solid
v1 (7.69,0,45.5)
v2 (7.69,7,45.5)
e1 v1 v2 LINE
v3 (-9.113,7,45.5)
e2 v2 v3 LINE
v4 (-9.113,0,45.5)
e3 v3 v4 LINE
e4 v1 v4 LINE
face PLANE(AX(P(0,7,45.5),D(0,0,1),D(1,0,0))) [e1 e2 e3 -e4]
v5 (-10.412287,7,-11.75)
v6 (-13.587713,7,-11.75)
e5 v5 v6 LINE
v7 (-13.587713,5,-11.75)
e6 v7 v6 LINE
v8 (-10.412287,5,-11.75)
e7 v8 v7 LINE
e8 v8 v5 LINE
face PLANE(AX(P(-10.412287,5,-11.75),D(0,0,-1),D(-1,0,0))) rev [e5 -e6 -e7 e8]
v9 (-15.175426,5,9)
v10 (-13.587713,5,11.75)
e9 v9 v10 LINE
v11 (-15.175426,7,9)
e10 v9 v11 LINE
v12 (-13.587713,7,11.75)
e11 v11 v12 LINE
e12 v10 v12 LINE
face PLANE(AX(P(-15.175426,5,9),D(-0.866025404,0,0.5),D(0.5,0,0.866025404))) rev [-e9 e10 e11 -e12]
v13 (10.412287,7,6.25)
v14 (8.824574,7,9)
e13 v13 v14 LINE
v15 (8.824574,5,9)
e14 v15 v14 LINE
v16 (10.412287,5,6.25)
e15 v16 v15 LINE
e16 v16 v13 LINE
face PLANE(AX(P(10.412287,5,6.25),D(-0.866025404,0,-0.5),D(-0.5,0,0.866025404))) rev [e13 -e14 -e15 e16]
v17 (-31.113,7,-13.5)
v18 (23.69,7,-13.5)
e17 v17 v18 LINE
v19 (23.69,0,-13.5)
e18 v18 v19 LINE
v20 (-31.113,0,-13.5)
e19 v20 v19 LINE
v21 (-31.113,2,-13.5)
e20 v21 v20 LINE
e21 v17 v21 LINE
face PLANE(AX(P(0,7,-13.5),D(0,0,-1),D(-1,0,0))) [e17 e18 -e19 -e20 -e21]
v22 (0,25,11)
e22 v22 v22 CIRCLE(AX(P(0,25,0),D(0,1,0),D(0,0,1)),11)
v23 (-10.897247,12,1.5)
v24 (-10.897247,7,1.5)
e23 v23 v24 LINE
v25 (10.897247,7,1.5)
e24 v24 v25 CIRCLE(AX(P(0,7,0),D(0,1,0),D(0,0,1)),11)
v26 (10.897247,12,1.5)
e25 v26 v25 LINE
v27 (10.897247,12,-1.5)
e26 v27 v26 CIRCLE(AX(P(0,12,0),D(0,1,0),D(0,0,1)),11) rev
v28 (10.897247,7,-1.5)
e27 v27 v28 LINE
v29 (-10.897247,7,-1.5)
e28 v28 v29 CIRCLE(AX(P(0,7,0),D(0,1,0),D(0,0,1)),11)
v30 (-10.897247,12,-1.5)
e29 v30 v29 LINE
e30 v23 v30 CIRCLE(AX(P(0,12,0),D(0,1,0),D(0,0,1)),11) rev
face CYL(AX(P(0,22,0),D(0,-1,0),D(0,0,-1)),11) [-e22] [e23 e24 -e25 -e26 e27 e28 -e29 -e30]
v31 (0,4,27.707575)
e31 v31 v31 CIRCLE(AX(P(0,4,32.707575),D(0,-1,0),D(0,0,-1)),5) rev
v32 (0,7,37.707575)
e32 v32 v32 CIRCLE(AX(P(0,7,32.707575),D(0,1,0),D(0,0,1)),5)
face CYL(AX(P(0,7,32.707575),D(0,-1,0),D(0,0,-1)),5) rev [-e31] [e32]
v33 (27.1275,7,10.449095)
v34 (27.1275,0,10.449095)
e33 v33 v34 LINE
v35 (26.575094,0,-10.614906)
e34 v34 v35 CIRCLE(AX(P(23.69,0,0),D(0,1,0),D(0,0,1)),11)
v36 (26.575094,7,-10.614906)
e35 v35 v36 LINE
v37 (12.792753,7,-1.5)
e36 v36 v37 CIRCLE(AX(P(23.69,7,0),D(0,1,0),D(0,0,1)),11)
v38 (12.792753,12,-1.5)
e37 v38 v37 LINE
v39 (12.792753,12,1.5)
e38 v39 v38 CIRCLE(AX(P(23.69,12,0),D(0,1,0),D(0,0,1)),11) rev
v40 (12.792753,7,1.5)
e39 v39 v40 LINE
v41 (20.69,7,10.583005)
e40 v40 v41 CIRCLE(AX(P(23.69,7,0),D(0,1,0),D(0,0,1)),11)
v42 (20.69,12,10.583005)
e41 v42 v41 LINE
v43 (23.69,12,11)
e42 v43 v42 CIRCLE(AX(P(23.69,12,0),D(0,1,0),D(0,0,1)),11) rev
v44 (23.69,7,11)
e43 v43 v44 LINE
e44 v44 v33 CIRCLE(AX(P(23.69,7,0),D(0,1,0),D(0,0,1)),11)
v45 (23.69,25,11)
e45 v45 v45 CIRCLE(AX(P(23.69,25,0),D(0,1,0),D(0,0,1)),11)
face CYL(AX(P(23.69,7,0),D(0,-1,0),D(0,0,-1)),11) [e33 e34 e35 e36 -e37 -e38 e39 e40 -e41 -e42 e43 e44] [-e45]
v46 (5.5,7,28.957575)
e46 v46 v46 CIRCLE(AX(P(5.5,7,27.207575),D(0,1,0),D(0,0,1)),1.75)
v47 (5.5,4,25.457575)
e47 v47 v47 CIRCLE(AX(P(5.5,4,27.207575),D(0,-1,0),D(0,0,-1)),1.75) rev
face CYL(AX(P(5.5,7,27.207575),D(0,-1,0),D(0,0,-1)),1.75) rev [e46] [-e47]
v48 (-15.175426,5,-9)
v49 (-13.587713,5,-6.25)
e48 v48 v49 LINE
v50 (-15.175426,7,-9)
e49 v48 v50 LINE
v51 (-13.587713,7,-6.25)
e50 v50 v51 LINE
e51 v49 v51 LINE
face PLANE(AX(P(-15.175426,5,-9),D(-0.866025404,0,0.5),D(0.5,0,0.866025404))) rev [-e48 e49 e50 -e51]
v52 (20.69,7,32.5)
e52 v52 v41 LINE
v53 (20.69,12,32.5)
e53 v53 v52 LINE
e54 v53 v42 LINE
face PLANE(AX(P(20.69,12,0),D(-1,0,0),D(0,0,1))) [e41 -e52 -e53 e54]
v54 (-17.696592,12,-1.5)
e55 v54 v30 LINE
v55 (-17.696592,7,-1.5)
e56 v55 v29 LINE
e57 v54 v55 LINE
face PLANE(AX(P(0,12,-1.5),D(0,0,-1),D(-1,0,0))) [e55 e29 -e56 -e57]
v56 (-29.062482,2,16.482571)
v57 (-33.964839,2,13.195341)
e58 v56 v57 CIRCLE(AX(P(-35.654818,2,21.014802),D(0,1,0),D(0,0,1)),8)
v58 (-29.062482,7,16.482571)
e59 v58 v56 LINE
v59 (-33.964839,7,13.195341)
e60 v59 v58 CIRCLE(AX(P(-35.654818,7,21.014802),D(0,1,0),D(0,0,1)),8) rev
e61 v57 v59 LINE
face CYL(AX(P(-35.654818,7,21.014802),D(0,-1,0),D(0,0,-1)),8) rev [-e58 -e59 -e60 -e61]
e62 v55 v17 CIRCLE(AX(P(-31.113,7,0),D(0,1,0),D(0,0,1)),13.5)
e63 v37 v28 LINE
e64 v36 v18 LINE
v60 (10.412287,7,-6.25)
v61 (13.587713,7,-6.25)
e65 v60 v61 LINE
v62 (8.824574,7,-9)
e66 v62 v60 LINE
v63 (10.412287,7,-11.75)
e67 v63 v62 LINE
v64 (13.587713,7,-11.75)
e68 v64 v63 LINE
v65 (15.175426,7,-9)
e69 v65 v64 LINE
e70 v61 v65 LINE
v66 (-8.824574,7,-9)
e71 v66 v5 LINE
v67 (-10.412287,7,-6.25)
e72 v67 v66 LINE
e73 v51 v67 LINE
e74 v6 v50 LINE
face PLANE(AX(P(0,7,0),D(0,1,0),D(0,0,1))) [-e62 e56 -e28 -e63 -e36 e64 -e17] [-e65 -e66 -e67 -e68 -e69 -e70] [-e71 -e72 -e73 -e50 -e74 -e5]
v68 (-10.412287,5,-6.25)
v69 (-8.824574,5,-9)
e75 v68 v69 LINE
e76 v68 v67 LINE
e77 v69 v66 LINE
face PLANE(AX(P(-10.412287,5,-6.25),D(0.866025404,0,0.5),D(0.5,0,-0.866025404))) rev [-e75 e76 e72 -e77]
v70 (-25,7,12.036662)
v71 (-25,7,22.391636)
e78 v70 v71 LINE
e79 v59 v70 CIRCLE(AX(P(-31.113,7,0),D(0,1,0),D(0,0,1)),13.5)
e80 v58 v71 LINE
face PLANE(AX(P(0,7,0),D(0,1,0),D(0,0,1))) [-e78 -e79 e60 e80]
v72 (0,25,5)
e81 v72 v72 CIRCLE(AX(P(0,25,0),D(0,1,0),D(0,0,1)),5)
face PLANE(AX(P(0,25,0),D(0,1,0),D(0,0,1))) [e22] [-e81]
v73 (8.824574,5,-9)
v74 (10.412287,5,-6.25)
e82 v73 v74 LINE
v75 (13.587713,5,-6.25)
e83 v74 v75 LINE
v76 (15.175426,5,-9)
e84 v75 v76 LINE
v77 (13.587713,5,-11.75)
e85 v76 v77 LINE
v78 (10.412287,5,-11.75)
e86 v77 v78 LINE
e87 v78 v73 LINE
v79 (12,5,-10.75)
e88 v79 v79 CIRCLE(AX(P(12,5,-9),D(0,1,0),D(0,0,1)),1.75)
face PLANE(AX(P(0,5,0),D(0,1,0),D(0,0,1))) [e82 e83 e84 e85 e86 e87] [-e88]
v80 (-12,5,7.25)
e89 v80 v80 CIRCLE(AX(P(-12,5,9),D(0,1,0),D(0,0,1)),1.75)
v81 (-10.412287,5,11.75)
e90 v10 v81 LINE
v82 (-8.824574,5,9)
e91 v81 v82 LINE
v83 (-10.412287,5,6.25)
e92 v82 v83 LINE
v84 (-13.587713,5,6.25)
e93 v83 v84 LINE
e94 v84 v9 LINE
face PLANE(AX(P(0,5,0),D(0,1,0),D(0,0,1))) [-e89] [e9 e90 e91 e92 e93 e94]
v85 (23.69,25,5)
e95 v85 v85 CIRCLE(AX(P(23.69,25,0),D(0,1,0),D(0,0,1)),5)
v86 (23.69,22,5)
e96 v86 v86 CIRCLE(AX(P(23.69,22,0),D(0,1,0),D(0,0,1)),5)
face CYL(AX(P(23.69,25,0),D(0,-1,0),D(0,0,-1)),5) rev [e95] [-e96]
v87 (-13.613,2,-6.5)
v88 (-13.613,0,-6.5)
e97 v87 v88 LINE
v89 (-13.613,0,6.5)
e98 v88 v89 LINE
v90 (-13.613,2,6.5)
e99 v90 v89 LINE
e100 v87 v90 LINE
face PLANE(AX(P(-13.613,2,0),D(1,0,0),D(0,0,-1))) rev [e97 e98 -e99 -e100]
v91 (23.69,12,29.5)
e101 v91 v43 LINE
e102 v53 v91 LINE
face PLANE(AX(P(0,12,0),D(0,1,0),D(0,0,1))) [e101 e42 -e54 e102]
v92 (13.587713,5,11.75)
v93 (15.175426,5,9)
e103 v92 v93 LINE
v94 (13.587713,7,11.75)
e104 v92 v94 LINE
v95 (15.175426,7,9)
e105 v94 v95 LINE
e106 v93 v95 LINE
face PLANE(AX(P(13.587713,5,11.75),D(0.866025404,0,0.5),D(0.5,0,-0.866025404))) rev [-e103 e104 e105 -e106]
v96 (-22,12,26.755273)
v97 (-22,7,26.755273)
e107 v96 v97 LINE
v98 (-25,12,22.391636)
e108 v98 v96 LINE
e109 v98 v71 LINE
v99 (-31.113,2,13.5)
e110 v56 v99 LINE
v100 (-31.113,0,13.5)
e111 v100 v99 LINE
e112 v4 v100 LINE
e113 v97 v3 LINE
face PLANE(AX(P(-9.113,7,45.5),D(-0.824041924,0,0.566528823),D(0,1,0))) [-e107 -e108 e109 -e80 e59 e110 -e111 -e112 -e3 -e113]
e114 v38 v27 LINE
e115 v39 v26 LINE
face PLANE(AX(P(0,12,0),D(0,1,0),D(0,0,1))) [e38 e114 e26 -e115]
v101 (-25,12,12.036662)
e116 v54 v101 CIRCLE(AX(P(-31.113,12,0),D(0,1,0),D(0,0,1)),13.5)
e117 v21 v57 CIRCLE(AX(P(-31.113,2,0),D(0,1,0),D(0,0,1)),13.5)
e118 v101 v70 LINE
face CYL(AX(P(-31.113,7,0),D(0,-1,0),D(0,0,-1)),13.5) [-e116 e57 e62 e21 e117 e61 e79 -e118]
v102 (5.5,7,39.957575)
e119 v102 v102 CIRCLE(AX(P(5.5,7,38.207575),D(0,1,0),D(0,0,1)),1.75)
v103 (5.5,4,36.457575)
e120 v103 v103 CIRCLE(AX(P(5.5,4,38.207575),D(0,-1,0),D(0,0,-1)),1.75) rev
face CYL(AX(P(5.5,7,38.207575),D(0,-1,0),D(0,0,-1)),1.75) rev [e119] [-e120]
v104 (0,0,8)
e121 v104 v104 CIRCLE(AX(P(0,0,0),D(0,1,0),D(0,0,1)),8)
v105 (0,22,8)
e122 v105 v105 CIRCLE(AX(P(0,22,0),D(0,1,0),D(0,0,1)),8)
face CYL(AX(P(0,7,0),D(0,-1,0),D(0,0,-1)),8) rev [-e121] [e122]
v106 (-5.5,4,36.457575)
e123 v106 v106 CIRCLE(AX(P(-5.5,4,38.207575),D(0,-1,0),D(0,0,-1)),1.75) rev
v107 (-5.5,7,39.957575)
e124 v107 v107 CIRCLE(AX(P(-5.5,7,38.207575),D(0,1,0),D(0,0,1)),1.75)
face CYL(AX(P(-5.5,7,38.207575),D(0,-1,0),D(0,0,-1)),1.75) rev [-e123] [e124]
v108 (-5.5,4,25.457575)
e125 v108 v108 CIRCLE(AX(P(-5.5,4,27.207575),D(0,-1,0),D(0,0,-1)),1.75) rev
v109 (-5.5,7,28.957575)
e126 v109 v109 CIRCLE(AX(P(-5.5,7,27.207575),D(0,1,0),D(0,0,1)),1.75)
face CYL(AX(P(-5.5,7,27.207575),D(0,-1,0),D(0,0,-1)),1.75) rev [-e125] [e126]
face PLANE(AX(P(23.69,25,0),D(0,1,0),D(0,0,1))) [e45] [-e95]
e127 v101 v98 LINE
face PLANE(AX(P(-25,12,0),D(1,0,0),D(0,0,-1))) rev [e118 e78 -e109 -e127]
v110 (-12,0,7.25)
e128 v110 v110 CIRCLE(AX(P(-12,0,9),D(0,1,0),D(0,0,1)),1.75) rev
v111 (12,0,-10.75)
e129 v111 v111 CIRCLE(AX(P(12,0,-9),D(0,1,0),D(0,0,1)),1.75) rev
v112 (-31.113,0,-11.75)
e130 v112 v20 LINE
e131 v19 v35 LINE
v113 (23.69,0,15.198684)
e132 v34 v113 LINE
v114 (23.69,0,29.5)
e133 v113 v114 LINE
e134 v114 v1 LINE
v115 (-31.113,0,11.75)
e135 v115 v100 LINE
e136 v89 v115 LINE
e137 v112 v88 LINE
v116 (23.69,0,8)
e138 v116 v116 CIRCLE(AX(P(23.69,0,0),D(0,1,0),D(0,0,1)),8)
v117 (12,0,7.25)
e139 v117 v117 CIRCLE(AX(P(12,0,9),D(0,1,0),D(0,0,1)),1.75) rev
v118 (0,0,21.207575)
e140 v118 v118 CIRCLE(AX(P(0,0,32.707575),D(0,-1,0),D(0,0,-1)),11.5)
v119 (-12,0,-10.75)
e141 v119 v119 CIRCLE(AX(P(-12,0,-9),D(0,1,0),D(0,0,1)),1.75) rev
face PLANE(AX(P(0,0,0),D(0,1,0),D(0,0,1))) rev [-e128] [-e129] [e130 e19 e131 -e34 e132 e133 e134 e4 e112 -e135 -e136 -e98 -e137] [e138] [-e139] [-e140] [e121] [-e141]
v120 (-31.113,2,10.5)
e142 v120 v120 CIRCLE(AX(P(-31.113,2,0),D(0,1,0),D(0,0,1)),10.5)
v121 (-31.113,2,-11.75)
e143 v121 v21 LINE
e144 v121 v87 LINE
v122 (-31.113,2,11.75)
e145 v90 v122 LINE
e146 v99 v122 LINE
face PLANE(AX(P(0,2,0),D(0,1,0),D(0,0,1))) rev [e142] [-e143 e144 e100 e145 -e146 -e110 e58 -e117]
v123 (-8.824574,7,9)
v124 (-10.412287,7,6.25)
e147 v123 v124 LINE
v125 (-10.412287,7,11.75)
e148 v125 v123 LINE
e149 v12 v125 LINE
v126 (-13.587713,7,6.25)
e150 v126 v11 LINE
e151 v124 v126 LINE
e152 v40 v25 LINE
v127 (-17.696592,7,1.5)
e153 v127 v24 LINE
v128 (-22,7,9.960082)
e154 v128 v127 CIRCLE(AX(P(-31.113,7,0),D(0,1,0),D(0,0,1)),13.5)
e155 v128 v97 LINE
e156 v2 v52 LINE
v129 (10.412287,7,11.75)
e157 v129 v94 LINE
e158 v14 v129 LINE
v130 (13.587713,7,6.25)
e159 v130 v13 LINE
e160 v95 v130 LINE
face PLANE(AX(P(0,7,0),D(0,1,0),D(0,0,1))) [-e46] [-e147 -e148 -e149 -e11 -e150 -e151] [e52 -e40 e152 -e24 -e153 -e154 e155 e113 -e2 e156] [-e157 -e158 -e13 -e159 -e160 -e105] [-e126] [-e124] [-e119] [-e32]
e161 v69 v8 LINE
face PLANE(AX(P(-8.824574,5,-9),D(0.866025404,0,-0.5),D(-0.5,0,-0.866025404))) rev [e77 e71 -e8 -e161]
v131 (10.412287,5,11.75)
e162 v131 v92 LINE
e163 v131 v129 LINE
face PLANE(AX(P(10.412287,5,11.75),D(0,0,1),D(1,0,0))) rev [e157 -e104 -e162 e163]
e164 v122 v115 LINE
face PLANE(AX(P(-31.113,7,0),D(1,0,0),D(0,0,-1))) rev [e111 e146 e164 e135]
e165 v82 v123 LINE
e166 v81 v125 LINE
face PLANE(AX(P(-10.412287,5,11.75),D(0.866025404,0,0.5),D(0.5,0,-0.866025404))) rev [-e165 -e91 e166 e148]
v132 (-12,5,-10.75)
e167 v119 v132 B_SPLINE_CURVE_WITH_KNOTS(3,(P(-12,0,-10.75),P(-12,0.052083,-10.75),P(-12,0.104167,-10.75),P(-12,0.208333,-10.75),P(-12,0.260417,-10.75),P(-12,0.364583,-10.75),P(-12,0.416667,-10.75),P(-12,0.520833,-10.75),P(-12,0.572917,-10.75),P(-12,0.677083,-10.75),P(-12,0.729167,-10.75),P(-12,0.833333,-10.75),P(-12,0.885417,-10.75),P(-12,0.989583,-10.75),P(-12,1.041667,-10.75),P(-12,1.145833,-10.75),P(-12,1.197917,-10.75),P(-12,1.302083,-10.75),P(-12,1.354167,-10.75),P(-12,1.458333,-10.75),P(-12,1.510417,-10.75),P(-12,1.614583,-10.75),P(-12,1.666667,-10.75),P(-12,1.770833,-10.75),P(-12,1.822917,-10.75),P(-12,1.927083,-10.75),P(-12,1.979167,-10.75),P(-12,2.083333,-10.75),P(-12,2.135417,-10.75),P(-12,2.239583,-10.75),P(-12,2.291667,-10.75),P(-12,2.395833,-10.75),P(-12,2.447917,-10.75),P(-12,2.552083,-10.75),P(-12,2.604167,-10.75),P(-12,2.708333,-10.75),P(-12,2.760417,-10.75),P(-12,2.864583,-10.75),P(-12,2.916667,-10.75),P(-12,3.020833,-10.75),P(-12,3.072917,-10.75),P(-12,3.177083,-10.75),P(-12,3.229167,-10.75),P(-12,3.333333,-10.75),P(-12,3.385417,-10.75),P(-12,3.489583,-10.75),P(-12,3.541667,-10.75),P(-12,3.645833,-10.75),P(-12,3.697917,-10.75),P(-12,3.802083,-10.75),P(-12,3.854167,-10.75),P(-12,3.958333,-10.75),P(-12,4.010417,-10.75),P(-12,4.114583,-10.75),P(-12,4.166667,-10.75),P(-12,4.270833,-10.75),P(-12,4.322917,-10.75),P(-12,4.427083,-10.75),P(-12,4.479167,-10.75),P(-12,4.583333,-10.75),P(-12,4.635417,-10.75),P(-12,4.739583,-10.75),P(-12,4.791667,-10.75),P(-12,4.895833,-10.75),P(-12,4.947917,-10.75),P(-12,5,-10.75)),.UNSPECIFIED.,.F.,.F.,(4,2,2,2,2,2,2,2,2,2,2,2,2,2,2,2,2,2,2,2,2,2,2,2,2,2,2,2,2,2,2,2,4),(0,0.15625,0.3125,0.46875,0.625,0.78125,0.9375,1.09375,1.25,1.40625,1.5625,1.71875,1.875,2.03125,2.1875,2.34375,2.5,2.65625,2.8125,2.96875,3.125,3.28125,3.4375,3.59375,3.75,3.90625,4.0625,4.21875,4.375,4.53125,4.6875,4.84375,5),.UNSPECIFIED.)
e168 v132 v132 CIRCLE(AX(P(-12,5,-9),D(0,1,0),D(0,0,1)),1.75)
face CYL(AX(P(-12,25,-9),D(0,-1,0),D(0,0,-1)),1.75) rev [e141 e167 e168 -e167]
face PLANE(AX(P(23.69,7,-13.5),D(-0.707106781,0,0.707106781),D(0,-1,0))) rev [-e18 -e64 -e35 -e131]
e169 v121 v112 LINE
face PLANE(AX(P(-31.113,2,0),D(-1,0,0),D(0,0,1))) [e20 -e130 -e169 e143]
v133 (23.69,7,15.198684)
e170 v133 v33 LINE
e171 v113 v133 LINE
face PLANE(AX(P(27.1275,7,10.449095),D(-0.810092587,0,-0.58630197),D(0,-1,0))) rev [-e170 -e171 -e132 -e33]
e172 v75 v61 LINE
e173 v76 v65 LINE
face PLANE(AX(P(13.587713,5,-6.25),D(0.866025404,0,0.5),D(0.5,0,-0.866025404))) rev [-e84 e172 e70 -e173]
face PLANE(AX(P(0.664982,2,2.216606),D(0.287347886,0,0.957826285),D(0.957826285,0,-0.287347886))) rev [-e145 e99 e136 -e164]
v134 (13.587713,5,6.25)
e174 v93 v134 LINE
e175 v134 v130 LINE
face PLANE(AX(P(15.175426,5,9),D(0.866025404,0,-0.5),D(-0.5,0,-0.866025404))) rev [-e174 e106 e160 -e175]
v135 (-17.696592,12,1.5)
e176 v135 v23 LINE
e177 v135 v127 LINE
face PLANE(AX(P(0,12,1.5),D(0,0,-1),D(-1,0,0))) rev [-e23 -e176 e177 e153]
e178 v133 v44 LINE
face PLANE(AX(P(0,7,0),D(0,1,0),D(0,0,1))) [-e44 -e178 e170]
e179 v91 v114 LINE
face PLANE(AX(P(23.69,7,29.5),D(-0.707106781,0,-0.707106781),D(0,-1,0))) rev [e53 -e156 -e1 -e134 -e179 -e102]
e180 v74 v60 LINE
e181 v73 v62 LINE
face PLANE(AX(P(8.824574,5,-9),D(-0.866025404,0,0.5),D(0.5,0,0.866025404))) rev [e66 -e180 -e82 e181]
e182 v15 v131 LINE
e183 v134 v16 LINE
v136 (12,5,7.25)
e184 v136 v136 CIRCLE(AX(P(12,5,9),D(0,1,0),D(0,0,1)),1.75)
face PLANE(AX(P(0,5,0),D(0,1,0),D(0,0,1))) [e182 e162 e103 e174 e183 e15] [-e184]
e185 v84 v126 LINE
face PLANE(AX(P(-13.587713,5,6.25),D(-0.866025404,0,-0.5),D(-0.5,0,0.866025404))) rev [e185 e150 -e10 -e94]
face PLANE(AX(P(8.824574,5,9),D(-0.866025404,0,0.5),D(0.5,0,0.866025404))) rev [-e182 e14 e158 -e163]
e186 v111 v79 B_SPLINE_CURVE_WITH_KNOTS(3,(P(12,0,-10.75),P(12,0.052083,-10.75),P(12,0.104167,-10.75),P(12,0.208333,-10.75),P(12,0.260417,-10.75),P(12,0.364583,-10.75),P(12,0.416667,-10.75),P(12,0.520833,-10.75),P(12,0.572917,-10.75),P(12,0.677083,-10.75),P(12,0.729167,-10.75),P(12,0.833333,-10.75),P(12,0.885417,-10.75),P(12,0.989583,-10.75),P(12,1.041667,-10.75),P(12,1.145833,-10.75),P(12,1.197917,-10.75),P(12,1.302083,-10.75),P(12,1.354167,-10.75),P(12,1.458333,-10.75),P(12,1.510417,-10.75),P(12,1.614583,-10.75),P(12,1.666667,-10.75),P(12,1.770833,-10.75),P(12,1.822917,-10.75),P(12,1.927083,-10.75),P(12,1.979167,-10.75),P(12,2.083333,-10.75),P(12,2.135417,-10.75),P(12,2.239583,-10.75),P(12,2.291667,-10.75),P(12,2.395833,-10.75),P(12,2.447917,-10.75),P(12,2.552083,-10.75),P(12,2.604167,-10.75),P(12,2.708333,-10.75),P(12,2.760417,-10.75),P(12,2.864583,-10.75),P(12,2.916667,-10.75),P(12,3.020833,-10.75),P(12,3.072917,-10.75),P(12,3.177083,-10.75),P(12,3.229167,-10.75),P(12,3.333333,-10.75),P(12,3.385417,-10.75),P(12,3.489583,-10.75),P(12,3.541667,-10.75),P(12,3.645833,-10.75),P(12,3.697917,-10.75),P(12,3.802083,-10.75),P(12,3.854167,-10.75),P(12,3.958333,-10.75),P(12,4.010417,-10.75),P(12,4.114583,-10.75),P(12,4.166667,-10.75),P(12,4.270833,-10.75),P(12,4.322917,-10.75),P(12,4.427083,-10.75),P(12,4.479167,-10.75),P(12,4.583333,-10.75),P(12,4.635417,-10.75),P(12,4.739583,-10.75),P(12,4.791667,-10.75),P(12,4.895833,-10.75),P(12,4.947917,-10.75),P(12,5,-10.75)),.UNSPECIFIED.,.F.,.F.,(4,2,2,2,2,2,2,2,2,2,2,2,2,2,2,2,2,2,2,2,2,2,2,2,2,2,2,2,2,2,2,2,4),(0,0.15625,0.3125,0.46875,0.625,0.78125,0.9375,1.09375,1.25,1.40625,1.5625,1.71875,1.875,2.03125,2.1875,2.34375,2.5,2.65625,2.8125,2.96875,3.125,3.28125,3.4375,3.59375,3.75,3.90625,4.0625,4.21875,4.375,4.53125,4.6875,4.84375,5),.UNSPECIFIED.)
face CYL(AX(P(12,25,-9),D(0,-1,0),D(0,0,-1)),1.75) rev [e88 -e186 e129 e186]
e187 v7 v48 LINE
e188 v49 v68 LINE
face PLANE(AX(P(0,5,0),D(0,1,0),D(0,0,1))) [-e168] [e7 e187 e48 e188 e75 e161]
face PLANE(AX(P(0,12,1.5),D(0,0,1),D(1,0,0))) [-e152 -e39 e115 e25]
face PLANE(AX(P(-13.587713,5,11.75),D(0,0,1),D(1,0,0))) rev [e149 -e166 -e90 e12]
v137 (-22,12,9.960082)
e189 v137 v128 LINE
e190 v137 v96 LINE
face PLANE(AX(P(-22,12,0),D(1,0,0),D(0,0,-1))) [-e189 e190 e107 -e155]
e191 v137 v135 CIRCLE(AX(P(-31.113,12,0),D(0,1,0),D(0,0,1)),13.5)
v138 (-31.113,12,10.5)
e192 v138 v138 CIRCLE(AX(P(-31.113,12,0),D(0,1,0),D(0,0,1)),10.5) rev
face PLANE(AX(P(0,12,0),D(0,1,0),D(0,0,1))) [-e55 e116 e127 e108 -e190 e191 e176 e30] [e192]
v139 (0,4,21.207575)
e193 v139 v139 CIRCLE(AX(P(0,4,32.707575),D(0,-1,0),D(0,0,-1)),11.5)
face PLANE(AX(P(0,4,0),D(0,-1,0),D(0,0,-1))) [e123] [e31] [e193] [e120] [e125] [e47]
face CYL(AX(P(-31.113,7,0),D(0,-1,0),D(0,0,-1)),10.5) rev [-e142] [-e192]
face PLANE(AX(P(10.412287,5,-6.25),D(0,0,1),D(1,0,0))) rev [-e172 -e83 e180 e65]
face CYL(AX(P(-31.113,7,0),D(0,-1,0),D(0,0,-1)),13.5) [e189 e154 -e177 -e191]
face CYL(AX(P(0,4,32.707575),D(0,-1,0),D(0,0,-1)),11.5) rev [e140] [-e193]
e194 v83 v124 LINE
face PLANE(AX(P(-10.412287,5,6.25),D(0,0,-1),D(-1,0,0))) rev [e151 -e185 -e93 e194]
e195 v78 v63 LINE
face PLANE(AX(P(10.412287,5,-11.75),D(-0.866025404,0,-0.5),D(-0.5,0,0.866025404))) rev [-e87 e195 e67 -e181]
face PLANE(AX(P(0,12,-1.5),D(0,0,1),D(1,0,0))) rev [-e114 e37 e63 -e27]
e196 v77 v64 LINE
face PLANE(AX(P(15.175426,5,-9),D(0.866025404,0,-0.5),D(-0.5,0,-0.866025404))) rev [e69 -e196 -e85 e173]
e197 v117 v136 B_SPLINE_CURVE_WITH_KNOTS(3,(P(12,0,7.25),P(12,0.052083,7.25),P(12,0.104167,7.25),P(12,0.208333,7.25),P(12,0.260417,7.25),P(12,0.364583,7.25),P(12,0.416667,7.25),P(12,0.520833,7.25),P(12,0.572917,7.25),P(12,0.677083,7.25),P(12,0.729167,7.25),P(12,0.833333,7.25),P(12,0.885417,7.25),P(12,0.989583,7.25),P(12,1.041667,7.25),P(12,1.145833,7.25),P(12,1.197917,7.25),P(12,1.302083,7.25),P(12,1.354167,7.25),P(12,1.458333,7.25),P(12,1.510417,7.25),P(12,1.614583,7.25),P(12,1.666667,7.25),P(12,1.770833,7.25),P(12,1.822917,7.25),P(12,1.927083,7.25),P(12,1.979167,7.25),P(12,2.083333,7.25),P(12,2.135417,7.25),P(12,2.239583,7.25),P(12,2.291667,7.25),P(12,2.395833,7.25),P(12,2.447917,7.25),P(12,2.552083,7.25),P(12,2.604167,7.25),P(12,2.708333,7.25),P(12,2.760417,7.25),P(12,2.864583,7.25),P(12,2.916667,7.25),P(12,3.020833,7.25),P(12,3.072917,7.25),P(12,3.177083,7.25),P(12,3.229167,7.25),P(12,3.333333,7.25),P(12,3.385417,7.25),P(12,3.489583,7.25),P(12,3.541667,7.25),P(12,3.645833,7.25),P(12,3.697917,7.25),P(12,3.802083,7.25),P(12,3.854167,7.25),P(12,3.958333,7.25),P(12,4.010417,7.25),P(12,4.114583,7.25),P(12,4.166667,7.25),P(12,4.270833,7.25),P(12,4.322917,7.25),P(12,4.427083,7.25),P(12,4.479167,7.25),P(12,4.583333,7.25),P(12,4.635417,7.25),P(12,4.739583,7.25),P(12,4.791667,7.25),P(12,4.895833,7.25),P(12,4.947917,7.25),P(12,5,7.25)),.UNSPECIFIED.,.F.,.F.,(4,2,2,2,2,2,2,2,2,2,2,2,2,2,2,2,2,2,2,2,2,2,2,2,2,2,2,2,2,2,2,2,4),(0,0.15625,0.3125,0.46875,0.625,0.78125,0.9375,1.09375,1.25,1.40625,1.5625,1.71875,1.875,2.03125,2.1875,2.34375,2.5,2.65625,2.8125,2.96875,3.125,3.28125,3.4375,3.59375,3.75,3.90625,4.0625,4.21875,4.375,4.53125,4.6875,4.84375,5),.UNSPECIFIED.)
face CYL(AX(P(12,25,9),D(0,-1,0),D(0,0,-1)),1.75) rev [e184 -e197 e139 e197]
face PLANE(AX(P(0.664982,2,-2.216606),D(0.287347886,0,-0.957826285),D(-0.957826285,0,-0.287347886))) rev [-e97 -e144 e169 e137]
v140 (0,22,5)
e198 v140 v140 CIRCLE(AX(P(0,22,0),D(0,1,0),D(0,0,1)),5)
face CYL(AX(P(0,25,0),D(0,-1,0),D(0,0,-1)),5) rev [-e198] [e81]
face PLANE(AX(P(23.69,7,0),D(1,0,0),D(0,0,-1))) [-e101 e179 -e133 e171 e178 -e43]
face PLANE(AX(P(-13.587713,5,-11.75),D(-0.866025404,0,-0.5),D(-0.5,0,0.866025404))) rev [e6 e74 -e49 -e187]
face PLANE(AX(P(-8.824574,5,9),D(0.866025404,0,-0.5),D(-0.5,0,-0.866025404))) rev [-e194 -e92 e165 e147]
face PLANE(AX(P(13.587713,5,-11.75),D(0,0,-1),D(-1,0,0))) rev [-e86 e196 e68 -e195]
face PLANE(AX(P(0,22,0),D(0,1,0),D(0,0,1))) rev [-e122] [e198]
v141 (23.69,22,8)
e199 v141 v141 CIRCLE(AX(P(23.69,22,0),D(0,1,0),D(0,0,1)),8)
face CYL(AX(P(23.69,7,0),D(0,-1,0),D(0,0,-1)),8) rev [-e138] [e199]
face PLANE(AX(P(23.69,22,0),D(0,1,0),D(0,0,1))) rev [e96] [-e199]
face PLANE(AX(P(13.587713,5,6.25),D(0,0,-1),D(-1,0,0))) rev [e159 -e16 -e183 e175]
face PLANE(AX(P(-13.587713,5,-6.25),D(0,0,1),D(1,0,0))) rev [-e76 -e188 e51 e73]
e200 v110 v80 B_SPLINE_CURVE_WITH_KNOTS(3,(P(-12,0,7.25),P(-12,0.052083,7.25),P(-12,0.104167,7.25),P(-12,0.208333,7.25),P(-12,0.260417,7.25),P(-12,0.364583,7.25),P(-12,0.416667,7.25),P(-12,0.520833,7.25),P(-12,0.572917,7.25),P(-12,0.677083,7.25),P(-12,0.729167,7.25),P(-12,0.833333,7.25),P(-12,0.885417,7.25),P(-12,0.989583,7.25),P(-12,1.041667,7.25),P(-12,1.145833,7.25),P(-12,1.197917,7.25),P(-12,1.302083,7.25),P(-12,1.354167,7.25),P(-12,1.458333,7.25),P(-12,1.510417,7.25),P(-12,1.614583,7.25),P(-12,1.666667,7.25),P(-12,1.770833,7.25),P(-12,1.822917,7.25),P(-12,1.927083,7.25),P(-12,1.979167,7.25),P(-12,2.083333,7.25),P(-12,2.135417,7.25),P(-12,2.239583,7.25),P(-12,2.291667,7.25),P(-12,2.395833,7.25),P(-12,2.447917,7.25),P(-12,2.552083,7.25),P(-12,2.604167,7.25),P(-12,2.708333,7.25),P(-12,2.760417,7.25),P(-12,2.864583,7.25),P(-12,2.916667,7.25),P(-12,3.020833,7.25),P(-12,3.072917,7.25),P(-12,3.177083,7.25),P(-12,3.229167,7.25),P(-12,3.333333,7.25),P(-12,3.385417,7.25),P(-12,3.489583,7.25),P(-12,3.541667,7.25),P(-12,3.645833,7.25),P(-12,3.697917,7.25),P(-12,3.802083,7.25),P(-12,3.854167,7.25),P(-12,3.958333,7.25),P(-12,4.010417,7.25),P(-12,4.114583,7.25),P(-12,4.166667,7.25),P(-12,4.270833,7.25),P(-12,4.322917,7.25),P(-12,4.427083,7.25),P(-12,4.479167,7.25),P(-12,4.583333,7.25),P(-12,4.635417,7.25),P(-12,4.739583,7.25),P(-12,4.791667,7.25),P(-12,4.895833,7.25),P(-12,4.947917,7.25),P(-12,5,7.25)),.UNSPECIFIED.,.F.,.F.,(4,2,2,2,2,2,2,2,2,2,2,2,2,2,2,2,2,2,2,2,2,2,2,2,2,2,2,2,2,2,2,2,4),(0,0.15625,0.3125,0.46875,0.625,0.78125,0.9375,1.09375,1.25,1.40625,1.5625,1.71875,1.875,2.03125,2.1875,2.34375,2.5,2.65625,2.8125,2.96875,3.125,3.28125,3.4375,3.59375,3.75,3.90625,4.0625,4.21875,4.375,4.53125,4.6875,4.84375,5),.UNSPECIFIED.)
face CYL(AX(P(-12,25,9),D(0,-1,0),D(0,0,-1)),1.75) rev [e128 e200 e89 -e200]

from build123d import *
from build123d.topology import SkipClean

# Parameters (mm, degrees)
SKETCH3_R               = 8
SKETCH3_W               = 54.803
SKETCH3_H               = 32
SKETCH3_R_2             = 5
BOSS_EXTRUDE1_DEPTH     = 7
CUT_EXTRUDE3_DEPTH      = 65.105926161
CUT_EXTRUDE3_DEPTH_BACK = 65.105926161
SKETCH4_R               = 1.75
SKETCH6_R               = 11
SKETCH6_R_2             = 8
BOSS_EXTRUDE2_DEPTH     = 15
SKETCH7_R               = 11
SKETCH7_R_2             = 5
BOSS_EXTRUDE3_DEPTH     = 3
CHAMFER1_SIZE           = 2.5
CUT_EXTRUDE4_DEPTH      = 2
CUT_EXTRUDE5_DEPTH      = 69.451221823
CUT_EXTRUDE5_DEPTH_BACK = 69.451221823
SKETCH9_R               = 1.75
CUT_EXTRUDE6_START      = -2
SKETCH10_R              = 1.75
CUT_EXTRUDE6_DEPTH      = 2
CHAMFER3_SIZE           = 32
CHAMFER3_SIZE2          = 22
CHAMFER4_SIZE           = 16
FILLET1_R               = 8
SKETCH12_R              = 10.5
BOSS_EXTRUDE4_DEPTH     = 5
BOSS_EXTRUDE5_DEPTH     = 5
SKETCH14_R              = 11.5
SKETCH14_R_2            = 5
SKETCH14_R_3            = 1.75
CUT_EXTRUDE7_DEPTH      = 4


with BuildPart() as part:
    # Sketch3 → Boss-Extrude1 (new body)
    # profile 1 of 10: a face of its own
    with BuildSketch(Plane(origin=(0, 0, 0), x_dir=(1, 0, 0), z_dir=(0, 1, 0))):
        with BuildLine():
            ThreePointArc((-17.613, 0), (-21.567058454, 9.545941546), (-31.113, 13.5))
            Line((-31.113, 13.5), (-31.113, 10.5))
            ThreePointArc((-31.113, 10.5), (-23.688378798, 7.424621202), (-20.613, 0))
            ThreePointArc((-20.613, 0), (-23.688378798, -7.424621202), (-31.113, -10.5))
            Line((-31.113, -10.5), (-31.113, -13.5))
            ThreePointArc((-31.113, -13.5), (-21.567058454, -9.545941546), (-17.613, 0))
        make_face()
    # profile 2 of 10: a face of its own
    with BuildSketch(Plane(origin=(0, 0, 0), x_dir=(1, 0, 0), z_dir=(0, 1, 0))):
        with BuildLine():
            Line((-31.113, 10.5), (-31.113, 13.5))
            ThreePointArc((-31.113, 13.5), (-44.613, 0), (-31.113, -13.5))
            Line((-31.113, -13.5), (-31.113, -10.5))
            ThreePointArc((-31.113, -10.5), (-41.613, 0), (-31.113, 10.5))
        make_face()
    # profile 3 of 10: a face of its own
    with BuildSketch(Plane(origin=(0, 0, 0), x_dir=(1, 0, 0), z_dir=(0, 1, 0))):
        with BuildLine():
            Line((23.69, 13.5), (-31.113, 13.5))
            ThreePointArc((-31.113, 13.5), (-21.567058454, 9.545941546), (-17.613, 0))
            ThreePointArc((-17.613, 0), (-21.567058454, -9.545941546), (-31.113, -13.5))
            Line((-31.113, -13.5), (23.69, -13.5))
            Line((23.69, -13.5), (23.69, -11))
            ThreePointArc((23.69, -11), (12.69, 0), (23.69, 11))
            Line((23.69, 11), (23.69, 13.5))
        make_face()
        with Locations(Location((0, 0, 0), (0, 0, 270))):
            Circle(SKETCH3_R, mode=Mode.SUBTRACT)
    # profile 4 of 10: a face of its own
    with BuildSketch(Plane(origin=(0, 0, 0), x_dir=(1, 0, 0), z_dir=(0, 1, 0))):
        with BuildLine():
            ThreePointArc((-17.613, 0), (-21.567058454, 9.545941546), (-31.113, 13.5))
            Line((-31.113, 13.5), (-31.113, 10.5))
            ThreePointArc((-31.113, 10.5), (-23.688378798, 7.424621202), (-20.613, 0))
            ThreePointArc((-20.613, 0), (-23.688378798, -7.424621202), (-31.113, -10.5))
            Line((-31.113, -10.5), (-31.113, -13.5))
            ThreePointArc((-31.113, -13.5), (-21.567058454, -9.545941546), (-17.613, 0))
        make_face()
    # profile 5 of 10: a face of its own
    with BuildSketch(Plane(origin=(0, 0, 0), x_dir=(1, 0, 0), z_dir=(0, 1, 0))):
        with BuildLine():
            Line((-31.113, 10.5), (-31.113, 13.5))
            ThreePointArc((-31.113, 13.5), (-44.613, 0), (-31.113, -13.5))
            Line((-31.113, -13.5), (-31.113, -10.5))
            ThreePointArc((-31.113, -10.5), (-41.613, 0), (-31.113, 10.5))
        make_face()
    # profile 6 of 10: a face of its own
    with BuildSketch(Plane(origin=(0, 0, 0), x_dir=(1, 0, 0), z_dir=(0, 1, 0))):
        with BuildLine():
            ThreePointArc((34.69, 0), (31.468174593, 7.778174593), (23.69, 11))
            Line((23.69, 11), (23.69, 8))
            ThreePointArc((23.69, 8), (29.346854249, 5.656854249), (31.69, 0))
            ThreePointArc((31.69, 0), (29.346854249, -5.656854249), (23.69, -8))
            Line((23.69, -8), (23.69, -11))
            ThreePointArc((23.69, -11), (31.468174593, -7.778174593), (34.69, 0))
        make_face()
    # profile 7 of 10: a face of its own
    with BuildSketch(Plane(origin=(0, 0, 0), x_dir=(1, 0, 0), z_dir=(0, 1, 0))):
        with BuildLine():
            Line((23.69, 8), (23.69, 11))
            ThreePointArc((23.69, 11), (12.69, 0), (23.69, -11))
            Line((23.69, -11), (23.69, -8))
            ThreePointArc((23.69, -8), (15.69, 0), (23.69, 8))
        make_face()
    # profile 8 of 10: a face of its own
    with BuildSketch(Plane(origin=(0, 0, 0), x_dir=(1, 0, 0), z_dir=(0, 1, 0))):
        with Locations((-3.7115, -29.5)):
            Rectangle(SKETCH3_W, SKETCH3_H)
        with Locations(Location((0, -32.707574931, 0), (0, 0, 270))):
            Circle(SKETCH3_R_2, mode=Mode.SUBTRACT)
    # profile 9 of 10: a face of its own
    with BuildSketch(Plane(origin=(0, 0, 0), x_dir=(1, 0, 0), z_dir=(0, 1, 0))):
        with BuildLine():
            ThreePointArc((34.69, 0), (31.468174593, 7.778174593), (23.69, 11))
            Line((23.69, 11), (23.69, 8))
            ThreePointArc((23.69, 8), (29.346854249, 5.656854249), (31.69, 0))
            ThreePointArc((31.69, 0), (29.346854249, -5.656854249), (23.69, -8))
            Line((23.69, -8), (23.69, -11))
            ThreePointArc((23.69, -11), (31.468174593, -7.778174593), (34.69, 0))
        make_face()
    # profile 10 of 10: a face of its own
    with BuildSketch(Plane(origin=(0, 0, 0), x_dir=(1, 0, 0), z_dir=(0, 1, 0))):
        with BuildLine():
            Line((23.69, 8), (23.69, 11))
            ThreePointArc((23.69, 11), (12.69, 0), (23.69, -11))
            Line((23.69, -11), (23.69, -8))
            ThreePointArc((23.69, -8), (15.69, 0), (23.69, 8))
        make_face()
    extrude(amount=BOSS_EXTRUDE1_DEPTH)

    # Sketch4 → Cut-Extrude3 (cut, two sides: drawn at the far end of the back side and taken through both)
    with BuildSketch(Plane(origin=(0, 0, 0), x_dir=(1, 0, 0), z_dir=(0, 1, 0)).offset(-CUT_EXTRUDE3_DEPTH_BACK)):
        with Locations(Location((5.5, -27.207574931, 0), (0, 0, 270))):
            Circle(SKETCH4_R)
        with Locations(Location((5.5, -38.207574931, 0), (0, 0, 270))):
            Circle(SKETCH4_R)
        with Locations(Location((-5.5, -38.207574931, 0), (0, 0, 270))):
            Circle(SKETCH4_R)
        with Locations(Location((-5.5, -27.207574931, 0), (0, 0, 270))):
            Circle(SKETCH4_R)
    extrude(amount=CUT_EXTRUDE3_DEPTH + CUT_EXTRUDE3_DEPTH_BACK, mode=Mode.SUBTRACT)

    # Sketch6 → Boss-Extrude2 (add)
    # profile 1 of 2: a face of its own
    with BuildSketch(Plane(origin=(0, 7, 0), x_dir=(1, 0, 0), z_dir=(0, 1, 0))):
        with Locations(Location((23.69, 0, 0), (0, 0, 270))):
            Circle(SKETCH6_R)
        with Locations(Location((23.69, 0, 0), (0, 0, 270))):
            Circle(SKETCH6_R_2, mode=Mode.SUBTRACT)
    # profile 2 of 2: a face of its own
    with BuildSketch(Plane(origin=(0, 7, 0), x_dir=(1, 0, 0), z_dir=(0, 1, 0))):
        with Locations(Location((0, 0, 0), (0, 0, 270))):
            Circle(SKETCH6_R)
        with Locations(Location((0, 0, 0), (0, 0, 270))):
            Circle(SKETCH6_R_2, mode=Mode.SUBTRACT)
    extrude(amount=BOSS_EXTRUDE2_DEPTH)

    # Sketch7 → Boss-Extrude3 (add)
    # profile 1 of 2: a face of its own
    with BuildSketch(Plane(origin=(0, 22, 0), x_dir=(1, 0, 0), z_dir=(0, 1, 0))):
        with Locations(Location((23.69, 0, 0), (0, 0, 270))):
            Circle(SKETCH7_R)
        with Locations(Location((23.69, 0, 0), (0, 0, 270))):
            Circle(SKETCH7_R_2, mode=Mode.SUBTRACT)
    # profile 2 of 2: a face of its own
    with BuildSketch(Plane(origin=(0, 22, 0), x_dir=(1, 0, 0), z_dir=(0, 1, 0))):
        with Locations(Location((0, 0, 0), (0, 0, 270))):
            Circle(SKETCH7_R)
        with Locations(Location((0, 0, 0), (0, 0, 270))):
            Circle(SKETCH7_R_2, mode=Mode.SUBTRACT)
    extrude(amount=BOSS_EXTRUDE3_DEPTH)

    # Chamfer1
    # the kernel refuses this chamfer: 2.5 mm, written as the material it adds along each edge
    with BuildSketch(Plane(origin=(23.69, 0, -11), x_dir=(0.9912092295509807, 0, 0.13230367815352426), z_dir=(0, 1, 0))) as chamfer1_piece_1_section:
        with BuildLine():
            Line((2.910680919, 0), (-CHAMFER1_SIZE * 0.132303678154, CHAMFER1_SIZE * 0.991209229551))
            Line((-CHAMFER1_SIZE * 0.132303678154, CHAMFER1_SIZE * 0.991209229551), (0, 0))
            ThreePointArc((0, 0), (1.49552658, 0.096625069), (2.910680919, 0))
        make_face()
    chamfer1_piece_1 = extrude(amount=7, mode=Mode.PRIVATE)
    chamfer1_piece_1 = split(chamfer1_piece_1, bisect_by=Plane(origin=(23.69, 0, -13.5), z_dir=(0, 0, 1)), keep=Keep.TOP, mode=Mode.PRIVATE)
    add(chamfer1_piece_1)

    # Sketch8 → Cut-Extrude4 (cut)
    with BuildSketch(Plane(origin=(0, 0, 0), x_dir=(1, 0, 0), z_dir=(0, 1, 0))):
        Polygon((-31.113, -11.75), (-31.113, 0), (-31.113, 11.75), (-31.113, 13.5), (-51.113, 13.5), (-51.113, -13.5), (-31.113, -13.5), align=None)
        Polygon((-31.113, 11.75), (-31.113, 0), (-31.113, -11.75), (-13.613, -6.5), (-13.613, 6.5), align=None)
    extrude(amount=CUT_EXTRUDE4_DEPTH, mode=Mode.SUBTRACT)

    # Sketch9 → Cut-Extrude5 (cut, two sides: drawn at the far end of the back side and taken through both)
    with BuildSketch(Plane(origin=(0, 0, 0), x_dir=(1, 0, 0), z_dir=(0, 1, 0)).offset(-CUT_EXTRUDE5_DEPTH_BACK)):
        with Locations(Location((12, 9, 0), (0, 0, 90))):
            Circle(SKETCH9_R)
        with Locations(Location((12, -9, 0), (0, 0, 90))):
            Circle(SKETCH9_R)
        with Locations(Location((-12, -9, 0), (0, 0, 90))):
            Circle(SKETCH9_R)
        with Locations(Location((-12, 9, 0), (0, 0, 90))):
            Circle(SKETCH9_R)
    extrude(amount=CUT_EXTRUDE5_DEPTH + CUT_EXTRUDE5_DEPTH_BACK, mode=Mode.SUBTRACT)

    # Sketch10 → Cut-Extrude6 (cut)
    # profile 1 of 4: a face of its own
    with BuildSketch(Plane(origin=(0, 7, 0), x_dir=(1, 0, 0), z_dir=(0, 1, 0)).offset(CUT_EXTRUDE6_START)):
        Polygon((-15.175426481, -9), (-13.58771324, -11.75), (-10.41228676, -11.75), (-8.824573519, -9), (-10.41228676, -6.25), (-13.58771324, -6.25), align=None)
        with Locations(Location((-12, -9, 0), (0, 0, 90))):
            Circle(SKETCH10_R, mode=Mode.SUBTRACT)
    # profile 2 of 4: a face of its own
    with BuildSketch(Plane(origin=(0, 7, 0), x_dir=(1, 0, 0), z_dir=(0, 1, 0)).offset(CUT_EXTRUDE6_START)):
        Polygon((-15.175426481, 9), (-13.58771324, 6.25), (-10.41228676, 6.25), (-8.824573519, 9), (-10.41228676, 11.75), (-13.58771324, 11.75), align=None)
        with Locations(Location((-12, 9, 0), (0, 0, 90))):
            Circle(SKETCH10_R, mode=Mode.SUBTRACT)
    # profile 3 of 4: a face of its own
    with BuildSketch(Plane(origin=(0, 7, 0), x_dir=(1, 0, 0), z_dir=(0, 1, 0)).offset(CUT_EXTRUDE6_START)):
        Polygon((15.175426481, 9), (13.58771324, 11.75), (10.41228676, 11.75), (8.824573519, 9), (10.41228676, 6.25), (13.58771324, 6.25), align=None)
        with Locations(Location((12, 9, 0), (0, 0, 90))):
            Circle(SKETCH10_R, mode=Mode.SUBTRACT)
    # profile 4 of 4: a face of its own
    with BuildSketch(Plane(origin=(0, 7, 0), x_dir=(1, 0, 0), z_dir=(0, 1, 0)).offset(CUT_EXTRUDE6_START)):
        Polygon((15.175426481, -9), (13.58771324, -6.25), (10.41228676, -6.25), (8.824573519, -9), (10.41228676, -11.75), (13.58771324, -11.75), align=None)
        with Locations(Location((12, -9, 0), (0, 0, 90))):
            Circle(SKETCH10_R, mode=Mode.SUBTRACT)
    extrude(amount=CUT_EXTRUDE6_DEPTH, mode=Mode.SUBTRACT)

    # Chamfer2
    # the kernel refuses this chamfer: 5 mm, written as the material it adds along each edge
    with BuildSketch(Plane(origin=(23.69, 0, 11), x_dir=(0.9874000606639179, 0, -0.15824386307497393), z_dir=(0, 1, 0))) as chamfer2_piece_1:
        with BuildLine():
            Line((3.622786344, 0.141421356), (-0.805837357, -4.287202344))
            Line((-0.805837357, -4.287202344), (-0.904577363, -4.271377958))
            ThreePointArc((-0.904577363, -4.271377958), (-0.443767224, -2.137054655), (-0.098740006, 0.015824386))
            Line((-0.098740006, 0.015824386), (0.015824386, 0.098740006))
            ThreePointArc((0.015824386, 0.098740006), (1.81210794, -0.038365312), (3.606961958, 0.240161362))
            Line((3.606961958, 0.240161362), (3.622786344, 0.141421356))
        make_face()
    extrude(amount=7)

    # Chamfer3
    chamfer3_edges = [part.edges().sort_by_distance(p)[0] for p in [
        (-31.113, 3.5, 45.5),
    ]]
    chamfer3_side = [part.faces().sort_by_distance(p)[0] for p in [
        (-31.113, 3.461538462, 29.240384615),
    ]]
    chamfer(chamfer3_edges, length=CHAMFER3_SIZE, length2=CHAMFER3_SIZE2, reference=chamfer3_side[0])

    # Chamfer4
    chamfer4_edges = [part.edges().sort_by_distance(p)[0] for p in [
        (23.69, 3.5, 45.5),
    ]]
    chamfer(chamfer4_edges, length=CHAMFER4_SIZE)

    # Fillet1
    fillet1_edges = [part.edges().sort_by_distance(p)[0] for p in [
        (-31.113, 4.5, 13.5),
    ]]
    fillet(fillet1_edges, radius=FILLET1_R)

    # Sketch12 → Boss-Extrude4 (add)
    # profile 1 of 4: a face of its own
    with BuildSketch(Plane(origin=(0, 7, 0), x_dir=(1, 0, 0), z_dir=(0, 1, 0))):
        with BuildLine():
            ThreePointArc((11, 0), (10.974281775, -0.751757625), (10.897247359, -1.5))
            Line((10.897247359, -1.5), (12.792752641, -1.5))
            ThreePointArc((12.792752641, -1.5), (12.69, 0), (12.792752641, 1.5))
            Line((12.792752641, 1.5), (10.897247359, 1.5))
            ThreePointArc((10.897247359, 1.5), (10.974281775, 0.751757625), (11, 0))
        make_face()
    # profile 2 of 4: a face of its own
    with BuildSketch(Plane(origin=(0, 7, 0), x_dir=(1, 0, 0), z_dir=(0, 1, 0))):
        with BuildLine():
            ThreePointArc((-17.613, 0), (-17.633914234, -0.751163705), (-17.696592135, -1.5))
            Line((-17.696592135, -1.5), (-10.897247359, -1.5))
            ThreePointArc((-10.897247359, -1.5), (-11, 0), (-10.897247359, 1.5))
            Line((-10.897247359, 1.5), (-17.696592135, 1.5))
            ThreePointArc((-17.696592135, 1.5), (-17.633914234, 0.751163705), (-17.613, 0))
        make_face()
    # profile 3 of 4: a face of its own
    with BuildSketch(Plane(origin=(0, 7, 0), x_dir=(1, 0, 0), z_dir=(0, 1, 0))):
        with BuildLine():
            Line((-17.696592135, -1.5), (-19.418433475, -1.5))
            Line((-19.418433475, -1.5), (-19.418433475, 1.5))
            Line((-19.418433475, 1.5), (-17.696592135, 1.5))
            ThreePointArc((-17.696592135, 1.5), (-22.113, 10.062305899), (-31.113, 13.5))
            ThreePointArc((-31.113, 13.5), (-44.536619079, 1.434033058), (-33.96483904, -13.19534062))
            ThreePointArc((-33.96483904, -13.19534062), (-23.232785747, -10.961396961), (-17.696592135, -1.5))
        make_face()
        with Locations(Location((-31.113, 0, 0), (0, 0, 270))):
            Circle(SKETCH12_R, mode=Mode.SUBTRACT)
    # profile 4 of 4: a face of its own
    with BuildSketch(Plane(origin=(0, 7, 0), x_dir=(1, 0, 0), z_dir=(0, 1, 0))):
        with BuildLine():
            Line((-19.418433475, 1.5), (-19.418433475, -1.5))
            Line((-19.418433475, -1.5), (-17.696592135, -1.5))
            ThreePointArc((-17.696592135, -1.5), (-17.633914234, -0.751163705), (-17.613, 0))
            ThreePointArc((-17.613, 0), (-17.633914234, 0.751163705), (-17.696592135, 1.5))
            Line((-17.696592135, 1.5), (-19.418433475, 1.5))
        make_face()
    extrude(amount=BOSS_EXTRUDE4_DEPTH)

    # Sketch13 → Boss-Extrude5 (add)
    with BuildSketch(Plane(origin=(0, 7, 0), x_dir=(1, 0, 0), z_dir=(0, 1, 0))):
        with BuildLine():
            Line((23.69, -29.5), (23.69, -15.198684154))
            Line((23.69, -15.198684154), (23.69, -11))
            ThreePointArc((23.69, -11), (22.175578937, -10.895252583), (20.69, -10.583005244))
            Line((20.69, -10.583005244), (20.69, -32.5))
            Line((20.69, -32.5), (23.69, -29.5))
        make_face()
        with BuildLine():
            Line((-25, -22.391636364), (-22, -26.755272727))
            Line((-22, -26.755272727), (-22, -9.960081877))
            ThreePointArc((-22, -9.960081877), (-23.429523235, -11.100188503), (-25, -12.036661954))
            Line((-25, -12.036661954), (-25, -22.391636364))
        make_face()
    extrude(amount=BOSS_EXTRUDE5_DEPTH)

    # Sketch14 → Cut-Extrude7 (cut)
    with SkipClean():  # the faces are left unmerged after this step: merging them gives an invalid solid
        with BuildSketch(Plane.XZ):
            with Locations(Location((0, 32.707574931, 0), (0, 0, 270))):
                Circle(SKETCH14_R)
            with Locations(Location((0, 32.707574931, 0), (0, 0, 270))):
                Circle(SKETCH14_R_2, mode=Mode.SUBTRACT)
            with Locations(Location((5.5, 38.207574931, 0), (0, 0, 270))):
                Circle(SKETCH14_R_3, mode=Mode.SUBTRACT)
            with Locations(Location((-5.5, 27.207574931, 0), (0, 0, 270))):
                Circle(SKETCH14_R_3, mode=Mode.SUBTRACT)
            with Locations(Location((-5.5, 38.207574931, 0), (0, 0, 270))):
                Circle(SKETCH14_R_3, mode=Mode.SUBTRACT)
            with Locations(Location((5.5, 27.207574931, 0), (0, 0, 270))):
                Circle(SKETCH14_R_3, mode=Mode.SUBTRACT)
        extrude(amount=-CUT_EXTRUDE7_DEPTH, mode=Mode.SUBTRACT)


solid = part.part
